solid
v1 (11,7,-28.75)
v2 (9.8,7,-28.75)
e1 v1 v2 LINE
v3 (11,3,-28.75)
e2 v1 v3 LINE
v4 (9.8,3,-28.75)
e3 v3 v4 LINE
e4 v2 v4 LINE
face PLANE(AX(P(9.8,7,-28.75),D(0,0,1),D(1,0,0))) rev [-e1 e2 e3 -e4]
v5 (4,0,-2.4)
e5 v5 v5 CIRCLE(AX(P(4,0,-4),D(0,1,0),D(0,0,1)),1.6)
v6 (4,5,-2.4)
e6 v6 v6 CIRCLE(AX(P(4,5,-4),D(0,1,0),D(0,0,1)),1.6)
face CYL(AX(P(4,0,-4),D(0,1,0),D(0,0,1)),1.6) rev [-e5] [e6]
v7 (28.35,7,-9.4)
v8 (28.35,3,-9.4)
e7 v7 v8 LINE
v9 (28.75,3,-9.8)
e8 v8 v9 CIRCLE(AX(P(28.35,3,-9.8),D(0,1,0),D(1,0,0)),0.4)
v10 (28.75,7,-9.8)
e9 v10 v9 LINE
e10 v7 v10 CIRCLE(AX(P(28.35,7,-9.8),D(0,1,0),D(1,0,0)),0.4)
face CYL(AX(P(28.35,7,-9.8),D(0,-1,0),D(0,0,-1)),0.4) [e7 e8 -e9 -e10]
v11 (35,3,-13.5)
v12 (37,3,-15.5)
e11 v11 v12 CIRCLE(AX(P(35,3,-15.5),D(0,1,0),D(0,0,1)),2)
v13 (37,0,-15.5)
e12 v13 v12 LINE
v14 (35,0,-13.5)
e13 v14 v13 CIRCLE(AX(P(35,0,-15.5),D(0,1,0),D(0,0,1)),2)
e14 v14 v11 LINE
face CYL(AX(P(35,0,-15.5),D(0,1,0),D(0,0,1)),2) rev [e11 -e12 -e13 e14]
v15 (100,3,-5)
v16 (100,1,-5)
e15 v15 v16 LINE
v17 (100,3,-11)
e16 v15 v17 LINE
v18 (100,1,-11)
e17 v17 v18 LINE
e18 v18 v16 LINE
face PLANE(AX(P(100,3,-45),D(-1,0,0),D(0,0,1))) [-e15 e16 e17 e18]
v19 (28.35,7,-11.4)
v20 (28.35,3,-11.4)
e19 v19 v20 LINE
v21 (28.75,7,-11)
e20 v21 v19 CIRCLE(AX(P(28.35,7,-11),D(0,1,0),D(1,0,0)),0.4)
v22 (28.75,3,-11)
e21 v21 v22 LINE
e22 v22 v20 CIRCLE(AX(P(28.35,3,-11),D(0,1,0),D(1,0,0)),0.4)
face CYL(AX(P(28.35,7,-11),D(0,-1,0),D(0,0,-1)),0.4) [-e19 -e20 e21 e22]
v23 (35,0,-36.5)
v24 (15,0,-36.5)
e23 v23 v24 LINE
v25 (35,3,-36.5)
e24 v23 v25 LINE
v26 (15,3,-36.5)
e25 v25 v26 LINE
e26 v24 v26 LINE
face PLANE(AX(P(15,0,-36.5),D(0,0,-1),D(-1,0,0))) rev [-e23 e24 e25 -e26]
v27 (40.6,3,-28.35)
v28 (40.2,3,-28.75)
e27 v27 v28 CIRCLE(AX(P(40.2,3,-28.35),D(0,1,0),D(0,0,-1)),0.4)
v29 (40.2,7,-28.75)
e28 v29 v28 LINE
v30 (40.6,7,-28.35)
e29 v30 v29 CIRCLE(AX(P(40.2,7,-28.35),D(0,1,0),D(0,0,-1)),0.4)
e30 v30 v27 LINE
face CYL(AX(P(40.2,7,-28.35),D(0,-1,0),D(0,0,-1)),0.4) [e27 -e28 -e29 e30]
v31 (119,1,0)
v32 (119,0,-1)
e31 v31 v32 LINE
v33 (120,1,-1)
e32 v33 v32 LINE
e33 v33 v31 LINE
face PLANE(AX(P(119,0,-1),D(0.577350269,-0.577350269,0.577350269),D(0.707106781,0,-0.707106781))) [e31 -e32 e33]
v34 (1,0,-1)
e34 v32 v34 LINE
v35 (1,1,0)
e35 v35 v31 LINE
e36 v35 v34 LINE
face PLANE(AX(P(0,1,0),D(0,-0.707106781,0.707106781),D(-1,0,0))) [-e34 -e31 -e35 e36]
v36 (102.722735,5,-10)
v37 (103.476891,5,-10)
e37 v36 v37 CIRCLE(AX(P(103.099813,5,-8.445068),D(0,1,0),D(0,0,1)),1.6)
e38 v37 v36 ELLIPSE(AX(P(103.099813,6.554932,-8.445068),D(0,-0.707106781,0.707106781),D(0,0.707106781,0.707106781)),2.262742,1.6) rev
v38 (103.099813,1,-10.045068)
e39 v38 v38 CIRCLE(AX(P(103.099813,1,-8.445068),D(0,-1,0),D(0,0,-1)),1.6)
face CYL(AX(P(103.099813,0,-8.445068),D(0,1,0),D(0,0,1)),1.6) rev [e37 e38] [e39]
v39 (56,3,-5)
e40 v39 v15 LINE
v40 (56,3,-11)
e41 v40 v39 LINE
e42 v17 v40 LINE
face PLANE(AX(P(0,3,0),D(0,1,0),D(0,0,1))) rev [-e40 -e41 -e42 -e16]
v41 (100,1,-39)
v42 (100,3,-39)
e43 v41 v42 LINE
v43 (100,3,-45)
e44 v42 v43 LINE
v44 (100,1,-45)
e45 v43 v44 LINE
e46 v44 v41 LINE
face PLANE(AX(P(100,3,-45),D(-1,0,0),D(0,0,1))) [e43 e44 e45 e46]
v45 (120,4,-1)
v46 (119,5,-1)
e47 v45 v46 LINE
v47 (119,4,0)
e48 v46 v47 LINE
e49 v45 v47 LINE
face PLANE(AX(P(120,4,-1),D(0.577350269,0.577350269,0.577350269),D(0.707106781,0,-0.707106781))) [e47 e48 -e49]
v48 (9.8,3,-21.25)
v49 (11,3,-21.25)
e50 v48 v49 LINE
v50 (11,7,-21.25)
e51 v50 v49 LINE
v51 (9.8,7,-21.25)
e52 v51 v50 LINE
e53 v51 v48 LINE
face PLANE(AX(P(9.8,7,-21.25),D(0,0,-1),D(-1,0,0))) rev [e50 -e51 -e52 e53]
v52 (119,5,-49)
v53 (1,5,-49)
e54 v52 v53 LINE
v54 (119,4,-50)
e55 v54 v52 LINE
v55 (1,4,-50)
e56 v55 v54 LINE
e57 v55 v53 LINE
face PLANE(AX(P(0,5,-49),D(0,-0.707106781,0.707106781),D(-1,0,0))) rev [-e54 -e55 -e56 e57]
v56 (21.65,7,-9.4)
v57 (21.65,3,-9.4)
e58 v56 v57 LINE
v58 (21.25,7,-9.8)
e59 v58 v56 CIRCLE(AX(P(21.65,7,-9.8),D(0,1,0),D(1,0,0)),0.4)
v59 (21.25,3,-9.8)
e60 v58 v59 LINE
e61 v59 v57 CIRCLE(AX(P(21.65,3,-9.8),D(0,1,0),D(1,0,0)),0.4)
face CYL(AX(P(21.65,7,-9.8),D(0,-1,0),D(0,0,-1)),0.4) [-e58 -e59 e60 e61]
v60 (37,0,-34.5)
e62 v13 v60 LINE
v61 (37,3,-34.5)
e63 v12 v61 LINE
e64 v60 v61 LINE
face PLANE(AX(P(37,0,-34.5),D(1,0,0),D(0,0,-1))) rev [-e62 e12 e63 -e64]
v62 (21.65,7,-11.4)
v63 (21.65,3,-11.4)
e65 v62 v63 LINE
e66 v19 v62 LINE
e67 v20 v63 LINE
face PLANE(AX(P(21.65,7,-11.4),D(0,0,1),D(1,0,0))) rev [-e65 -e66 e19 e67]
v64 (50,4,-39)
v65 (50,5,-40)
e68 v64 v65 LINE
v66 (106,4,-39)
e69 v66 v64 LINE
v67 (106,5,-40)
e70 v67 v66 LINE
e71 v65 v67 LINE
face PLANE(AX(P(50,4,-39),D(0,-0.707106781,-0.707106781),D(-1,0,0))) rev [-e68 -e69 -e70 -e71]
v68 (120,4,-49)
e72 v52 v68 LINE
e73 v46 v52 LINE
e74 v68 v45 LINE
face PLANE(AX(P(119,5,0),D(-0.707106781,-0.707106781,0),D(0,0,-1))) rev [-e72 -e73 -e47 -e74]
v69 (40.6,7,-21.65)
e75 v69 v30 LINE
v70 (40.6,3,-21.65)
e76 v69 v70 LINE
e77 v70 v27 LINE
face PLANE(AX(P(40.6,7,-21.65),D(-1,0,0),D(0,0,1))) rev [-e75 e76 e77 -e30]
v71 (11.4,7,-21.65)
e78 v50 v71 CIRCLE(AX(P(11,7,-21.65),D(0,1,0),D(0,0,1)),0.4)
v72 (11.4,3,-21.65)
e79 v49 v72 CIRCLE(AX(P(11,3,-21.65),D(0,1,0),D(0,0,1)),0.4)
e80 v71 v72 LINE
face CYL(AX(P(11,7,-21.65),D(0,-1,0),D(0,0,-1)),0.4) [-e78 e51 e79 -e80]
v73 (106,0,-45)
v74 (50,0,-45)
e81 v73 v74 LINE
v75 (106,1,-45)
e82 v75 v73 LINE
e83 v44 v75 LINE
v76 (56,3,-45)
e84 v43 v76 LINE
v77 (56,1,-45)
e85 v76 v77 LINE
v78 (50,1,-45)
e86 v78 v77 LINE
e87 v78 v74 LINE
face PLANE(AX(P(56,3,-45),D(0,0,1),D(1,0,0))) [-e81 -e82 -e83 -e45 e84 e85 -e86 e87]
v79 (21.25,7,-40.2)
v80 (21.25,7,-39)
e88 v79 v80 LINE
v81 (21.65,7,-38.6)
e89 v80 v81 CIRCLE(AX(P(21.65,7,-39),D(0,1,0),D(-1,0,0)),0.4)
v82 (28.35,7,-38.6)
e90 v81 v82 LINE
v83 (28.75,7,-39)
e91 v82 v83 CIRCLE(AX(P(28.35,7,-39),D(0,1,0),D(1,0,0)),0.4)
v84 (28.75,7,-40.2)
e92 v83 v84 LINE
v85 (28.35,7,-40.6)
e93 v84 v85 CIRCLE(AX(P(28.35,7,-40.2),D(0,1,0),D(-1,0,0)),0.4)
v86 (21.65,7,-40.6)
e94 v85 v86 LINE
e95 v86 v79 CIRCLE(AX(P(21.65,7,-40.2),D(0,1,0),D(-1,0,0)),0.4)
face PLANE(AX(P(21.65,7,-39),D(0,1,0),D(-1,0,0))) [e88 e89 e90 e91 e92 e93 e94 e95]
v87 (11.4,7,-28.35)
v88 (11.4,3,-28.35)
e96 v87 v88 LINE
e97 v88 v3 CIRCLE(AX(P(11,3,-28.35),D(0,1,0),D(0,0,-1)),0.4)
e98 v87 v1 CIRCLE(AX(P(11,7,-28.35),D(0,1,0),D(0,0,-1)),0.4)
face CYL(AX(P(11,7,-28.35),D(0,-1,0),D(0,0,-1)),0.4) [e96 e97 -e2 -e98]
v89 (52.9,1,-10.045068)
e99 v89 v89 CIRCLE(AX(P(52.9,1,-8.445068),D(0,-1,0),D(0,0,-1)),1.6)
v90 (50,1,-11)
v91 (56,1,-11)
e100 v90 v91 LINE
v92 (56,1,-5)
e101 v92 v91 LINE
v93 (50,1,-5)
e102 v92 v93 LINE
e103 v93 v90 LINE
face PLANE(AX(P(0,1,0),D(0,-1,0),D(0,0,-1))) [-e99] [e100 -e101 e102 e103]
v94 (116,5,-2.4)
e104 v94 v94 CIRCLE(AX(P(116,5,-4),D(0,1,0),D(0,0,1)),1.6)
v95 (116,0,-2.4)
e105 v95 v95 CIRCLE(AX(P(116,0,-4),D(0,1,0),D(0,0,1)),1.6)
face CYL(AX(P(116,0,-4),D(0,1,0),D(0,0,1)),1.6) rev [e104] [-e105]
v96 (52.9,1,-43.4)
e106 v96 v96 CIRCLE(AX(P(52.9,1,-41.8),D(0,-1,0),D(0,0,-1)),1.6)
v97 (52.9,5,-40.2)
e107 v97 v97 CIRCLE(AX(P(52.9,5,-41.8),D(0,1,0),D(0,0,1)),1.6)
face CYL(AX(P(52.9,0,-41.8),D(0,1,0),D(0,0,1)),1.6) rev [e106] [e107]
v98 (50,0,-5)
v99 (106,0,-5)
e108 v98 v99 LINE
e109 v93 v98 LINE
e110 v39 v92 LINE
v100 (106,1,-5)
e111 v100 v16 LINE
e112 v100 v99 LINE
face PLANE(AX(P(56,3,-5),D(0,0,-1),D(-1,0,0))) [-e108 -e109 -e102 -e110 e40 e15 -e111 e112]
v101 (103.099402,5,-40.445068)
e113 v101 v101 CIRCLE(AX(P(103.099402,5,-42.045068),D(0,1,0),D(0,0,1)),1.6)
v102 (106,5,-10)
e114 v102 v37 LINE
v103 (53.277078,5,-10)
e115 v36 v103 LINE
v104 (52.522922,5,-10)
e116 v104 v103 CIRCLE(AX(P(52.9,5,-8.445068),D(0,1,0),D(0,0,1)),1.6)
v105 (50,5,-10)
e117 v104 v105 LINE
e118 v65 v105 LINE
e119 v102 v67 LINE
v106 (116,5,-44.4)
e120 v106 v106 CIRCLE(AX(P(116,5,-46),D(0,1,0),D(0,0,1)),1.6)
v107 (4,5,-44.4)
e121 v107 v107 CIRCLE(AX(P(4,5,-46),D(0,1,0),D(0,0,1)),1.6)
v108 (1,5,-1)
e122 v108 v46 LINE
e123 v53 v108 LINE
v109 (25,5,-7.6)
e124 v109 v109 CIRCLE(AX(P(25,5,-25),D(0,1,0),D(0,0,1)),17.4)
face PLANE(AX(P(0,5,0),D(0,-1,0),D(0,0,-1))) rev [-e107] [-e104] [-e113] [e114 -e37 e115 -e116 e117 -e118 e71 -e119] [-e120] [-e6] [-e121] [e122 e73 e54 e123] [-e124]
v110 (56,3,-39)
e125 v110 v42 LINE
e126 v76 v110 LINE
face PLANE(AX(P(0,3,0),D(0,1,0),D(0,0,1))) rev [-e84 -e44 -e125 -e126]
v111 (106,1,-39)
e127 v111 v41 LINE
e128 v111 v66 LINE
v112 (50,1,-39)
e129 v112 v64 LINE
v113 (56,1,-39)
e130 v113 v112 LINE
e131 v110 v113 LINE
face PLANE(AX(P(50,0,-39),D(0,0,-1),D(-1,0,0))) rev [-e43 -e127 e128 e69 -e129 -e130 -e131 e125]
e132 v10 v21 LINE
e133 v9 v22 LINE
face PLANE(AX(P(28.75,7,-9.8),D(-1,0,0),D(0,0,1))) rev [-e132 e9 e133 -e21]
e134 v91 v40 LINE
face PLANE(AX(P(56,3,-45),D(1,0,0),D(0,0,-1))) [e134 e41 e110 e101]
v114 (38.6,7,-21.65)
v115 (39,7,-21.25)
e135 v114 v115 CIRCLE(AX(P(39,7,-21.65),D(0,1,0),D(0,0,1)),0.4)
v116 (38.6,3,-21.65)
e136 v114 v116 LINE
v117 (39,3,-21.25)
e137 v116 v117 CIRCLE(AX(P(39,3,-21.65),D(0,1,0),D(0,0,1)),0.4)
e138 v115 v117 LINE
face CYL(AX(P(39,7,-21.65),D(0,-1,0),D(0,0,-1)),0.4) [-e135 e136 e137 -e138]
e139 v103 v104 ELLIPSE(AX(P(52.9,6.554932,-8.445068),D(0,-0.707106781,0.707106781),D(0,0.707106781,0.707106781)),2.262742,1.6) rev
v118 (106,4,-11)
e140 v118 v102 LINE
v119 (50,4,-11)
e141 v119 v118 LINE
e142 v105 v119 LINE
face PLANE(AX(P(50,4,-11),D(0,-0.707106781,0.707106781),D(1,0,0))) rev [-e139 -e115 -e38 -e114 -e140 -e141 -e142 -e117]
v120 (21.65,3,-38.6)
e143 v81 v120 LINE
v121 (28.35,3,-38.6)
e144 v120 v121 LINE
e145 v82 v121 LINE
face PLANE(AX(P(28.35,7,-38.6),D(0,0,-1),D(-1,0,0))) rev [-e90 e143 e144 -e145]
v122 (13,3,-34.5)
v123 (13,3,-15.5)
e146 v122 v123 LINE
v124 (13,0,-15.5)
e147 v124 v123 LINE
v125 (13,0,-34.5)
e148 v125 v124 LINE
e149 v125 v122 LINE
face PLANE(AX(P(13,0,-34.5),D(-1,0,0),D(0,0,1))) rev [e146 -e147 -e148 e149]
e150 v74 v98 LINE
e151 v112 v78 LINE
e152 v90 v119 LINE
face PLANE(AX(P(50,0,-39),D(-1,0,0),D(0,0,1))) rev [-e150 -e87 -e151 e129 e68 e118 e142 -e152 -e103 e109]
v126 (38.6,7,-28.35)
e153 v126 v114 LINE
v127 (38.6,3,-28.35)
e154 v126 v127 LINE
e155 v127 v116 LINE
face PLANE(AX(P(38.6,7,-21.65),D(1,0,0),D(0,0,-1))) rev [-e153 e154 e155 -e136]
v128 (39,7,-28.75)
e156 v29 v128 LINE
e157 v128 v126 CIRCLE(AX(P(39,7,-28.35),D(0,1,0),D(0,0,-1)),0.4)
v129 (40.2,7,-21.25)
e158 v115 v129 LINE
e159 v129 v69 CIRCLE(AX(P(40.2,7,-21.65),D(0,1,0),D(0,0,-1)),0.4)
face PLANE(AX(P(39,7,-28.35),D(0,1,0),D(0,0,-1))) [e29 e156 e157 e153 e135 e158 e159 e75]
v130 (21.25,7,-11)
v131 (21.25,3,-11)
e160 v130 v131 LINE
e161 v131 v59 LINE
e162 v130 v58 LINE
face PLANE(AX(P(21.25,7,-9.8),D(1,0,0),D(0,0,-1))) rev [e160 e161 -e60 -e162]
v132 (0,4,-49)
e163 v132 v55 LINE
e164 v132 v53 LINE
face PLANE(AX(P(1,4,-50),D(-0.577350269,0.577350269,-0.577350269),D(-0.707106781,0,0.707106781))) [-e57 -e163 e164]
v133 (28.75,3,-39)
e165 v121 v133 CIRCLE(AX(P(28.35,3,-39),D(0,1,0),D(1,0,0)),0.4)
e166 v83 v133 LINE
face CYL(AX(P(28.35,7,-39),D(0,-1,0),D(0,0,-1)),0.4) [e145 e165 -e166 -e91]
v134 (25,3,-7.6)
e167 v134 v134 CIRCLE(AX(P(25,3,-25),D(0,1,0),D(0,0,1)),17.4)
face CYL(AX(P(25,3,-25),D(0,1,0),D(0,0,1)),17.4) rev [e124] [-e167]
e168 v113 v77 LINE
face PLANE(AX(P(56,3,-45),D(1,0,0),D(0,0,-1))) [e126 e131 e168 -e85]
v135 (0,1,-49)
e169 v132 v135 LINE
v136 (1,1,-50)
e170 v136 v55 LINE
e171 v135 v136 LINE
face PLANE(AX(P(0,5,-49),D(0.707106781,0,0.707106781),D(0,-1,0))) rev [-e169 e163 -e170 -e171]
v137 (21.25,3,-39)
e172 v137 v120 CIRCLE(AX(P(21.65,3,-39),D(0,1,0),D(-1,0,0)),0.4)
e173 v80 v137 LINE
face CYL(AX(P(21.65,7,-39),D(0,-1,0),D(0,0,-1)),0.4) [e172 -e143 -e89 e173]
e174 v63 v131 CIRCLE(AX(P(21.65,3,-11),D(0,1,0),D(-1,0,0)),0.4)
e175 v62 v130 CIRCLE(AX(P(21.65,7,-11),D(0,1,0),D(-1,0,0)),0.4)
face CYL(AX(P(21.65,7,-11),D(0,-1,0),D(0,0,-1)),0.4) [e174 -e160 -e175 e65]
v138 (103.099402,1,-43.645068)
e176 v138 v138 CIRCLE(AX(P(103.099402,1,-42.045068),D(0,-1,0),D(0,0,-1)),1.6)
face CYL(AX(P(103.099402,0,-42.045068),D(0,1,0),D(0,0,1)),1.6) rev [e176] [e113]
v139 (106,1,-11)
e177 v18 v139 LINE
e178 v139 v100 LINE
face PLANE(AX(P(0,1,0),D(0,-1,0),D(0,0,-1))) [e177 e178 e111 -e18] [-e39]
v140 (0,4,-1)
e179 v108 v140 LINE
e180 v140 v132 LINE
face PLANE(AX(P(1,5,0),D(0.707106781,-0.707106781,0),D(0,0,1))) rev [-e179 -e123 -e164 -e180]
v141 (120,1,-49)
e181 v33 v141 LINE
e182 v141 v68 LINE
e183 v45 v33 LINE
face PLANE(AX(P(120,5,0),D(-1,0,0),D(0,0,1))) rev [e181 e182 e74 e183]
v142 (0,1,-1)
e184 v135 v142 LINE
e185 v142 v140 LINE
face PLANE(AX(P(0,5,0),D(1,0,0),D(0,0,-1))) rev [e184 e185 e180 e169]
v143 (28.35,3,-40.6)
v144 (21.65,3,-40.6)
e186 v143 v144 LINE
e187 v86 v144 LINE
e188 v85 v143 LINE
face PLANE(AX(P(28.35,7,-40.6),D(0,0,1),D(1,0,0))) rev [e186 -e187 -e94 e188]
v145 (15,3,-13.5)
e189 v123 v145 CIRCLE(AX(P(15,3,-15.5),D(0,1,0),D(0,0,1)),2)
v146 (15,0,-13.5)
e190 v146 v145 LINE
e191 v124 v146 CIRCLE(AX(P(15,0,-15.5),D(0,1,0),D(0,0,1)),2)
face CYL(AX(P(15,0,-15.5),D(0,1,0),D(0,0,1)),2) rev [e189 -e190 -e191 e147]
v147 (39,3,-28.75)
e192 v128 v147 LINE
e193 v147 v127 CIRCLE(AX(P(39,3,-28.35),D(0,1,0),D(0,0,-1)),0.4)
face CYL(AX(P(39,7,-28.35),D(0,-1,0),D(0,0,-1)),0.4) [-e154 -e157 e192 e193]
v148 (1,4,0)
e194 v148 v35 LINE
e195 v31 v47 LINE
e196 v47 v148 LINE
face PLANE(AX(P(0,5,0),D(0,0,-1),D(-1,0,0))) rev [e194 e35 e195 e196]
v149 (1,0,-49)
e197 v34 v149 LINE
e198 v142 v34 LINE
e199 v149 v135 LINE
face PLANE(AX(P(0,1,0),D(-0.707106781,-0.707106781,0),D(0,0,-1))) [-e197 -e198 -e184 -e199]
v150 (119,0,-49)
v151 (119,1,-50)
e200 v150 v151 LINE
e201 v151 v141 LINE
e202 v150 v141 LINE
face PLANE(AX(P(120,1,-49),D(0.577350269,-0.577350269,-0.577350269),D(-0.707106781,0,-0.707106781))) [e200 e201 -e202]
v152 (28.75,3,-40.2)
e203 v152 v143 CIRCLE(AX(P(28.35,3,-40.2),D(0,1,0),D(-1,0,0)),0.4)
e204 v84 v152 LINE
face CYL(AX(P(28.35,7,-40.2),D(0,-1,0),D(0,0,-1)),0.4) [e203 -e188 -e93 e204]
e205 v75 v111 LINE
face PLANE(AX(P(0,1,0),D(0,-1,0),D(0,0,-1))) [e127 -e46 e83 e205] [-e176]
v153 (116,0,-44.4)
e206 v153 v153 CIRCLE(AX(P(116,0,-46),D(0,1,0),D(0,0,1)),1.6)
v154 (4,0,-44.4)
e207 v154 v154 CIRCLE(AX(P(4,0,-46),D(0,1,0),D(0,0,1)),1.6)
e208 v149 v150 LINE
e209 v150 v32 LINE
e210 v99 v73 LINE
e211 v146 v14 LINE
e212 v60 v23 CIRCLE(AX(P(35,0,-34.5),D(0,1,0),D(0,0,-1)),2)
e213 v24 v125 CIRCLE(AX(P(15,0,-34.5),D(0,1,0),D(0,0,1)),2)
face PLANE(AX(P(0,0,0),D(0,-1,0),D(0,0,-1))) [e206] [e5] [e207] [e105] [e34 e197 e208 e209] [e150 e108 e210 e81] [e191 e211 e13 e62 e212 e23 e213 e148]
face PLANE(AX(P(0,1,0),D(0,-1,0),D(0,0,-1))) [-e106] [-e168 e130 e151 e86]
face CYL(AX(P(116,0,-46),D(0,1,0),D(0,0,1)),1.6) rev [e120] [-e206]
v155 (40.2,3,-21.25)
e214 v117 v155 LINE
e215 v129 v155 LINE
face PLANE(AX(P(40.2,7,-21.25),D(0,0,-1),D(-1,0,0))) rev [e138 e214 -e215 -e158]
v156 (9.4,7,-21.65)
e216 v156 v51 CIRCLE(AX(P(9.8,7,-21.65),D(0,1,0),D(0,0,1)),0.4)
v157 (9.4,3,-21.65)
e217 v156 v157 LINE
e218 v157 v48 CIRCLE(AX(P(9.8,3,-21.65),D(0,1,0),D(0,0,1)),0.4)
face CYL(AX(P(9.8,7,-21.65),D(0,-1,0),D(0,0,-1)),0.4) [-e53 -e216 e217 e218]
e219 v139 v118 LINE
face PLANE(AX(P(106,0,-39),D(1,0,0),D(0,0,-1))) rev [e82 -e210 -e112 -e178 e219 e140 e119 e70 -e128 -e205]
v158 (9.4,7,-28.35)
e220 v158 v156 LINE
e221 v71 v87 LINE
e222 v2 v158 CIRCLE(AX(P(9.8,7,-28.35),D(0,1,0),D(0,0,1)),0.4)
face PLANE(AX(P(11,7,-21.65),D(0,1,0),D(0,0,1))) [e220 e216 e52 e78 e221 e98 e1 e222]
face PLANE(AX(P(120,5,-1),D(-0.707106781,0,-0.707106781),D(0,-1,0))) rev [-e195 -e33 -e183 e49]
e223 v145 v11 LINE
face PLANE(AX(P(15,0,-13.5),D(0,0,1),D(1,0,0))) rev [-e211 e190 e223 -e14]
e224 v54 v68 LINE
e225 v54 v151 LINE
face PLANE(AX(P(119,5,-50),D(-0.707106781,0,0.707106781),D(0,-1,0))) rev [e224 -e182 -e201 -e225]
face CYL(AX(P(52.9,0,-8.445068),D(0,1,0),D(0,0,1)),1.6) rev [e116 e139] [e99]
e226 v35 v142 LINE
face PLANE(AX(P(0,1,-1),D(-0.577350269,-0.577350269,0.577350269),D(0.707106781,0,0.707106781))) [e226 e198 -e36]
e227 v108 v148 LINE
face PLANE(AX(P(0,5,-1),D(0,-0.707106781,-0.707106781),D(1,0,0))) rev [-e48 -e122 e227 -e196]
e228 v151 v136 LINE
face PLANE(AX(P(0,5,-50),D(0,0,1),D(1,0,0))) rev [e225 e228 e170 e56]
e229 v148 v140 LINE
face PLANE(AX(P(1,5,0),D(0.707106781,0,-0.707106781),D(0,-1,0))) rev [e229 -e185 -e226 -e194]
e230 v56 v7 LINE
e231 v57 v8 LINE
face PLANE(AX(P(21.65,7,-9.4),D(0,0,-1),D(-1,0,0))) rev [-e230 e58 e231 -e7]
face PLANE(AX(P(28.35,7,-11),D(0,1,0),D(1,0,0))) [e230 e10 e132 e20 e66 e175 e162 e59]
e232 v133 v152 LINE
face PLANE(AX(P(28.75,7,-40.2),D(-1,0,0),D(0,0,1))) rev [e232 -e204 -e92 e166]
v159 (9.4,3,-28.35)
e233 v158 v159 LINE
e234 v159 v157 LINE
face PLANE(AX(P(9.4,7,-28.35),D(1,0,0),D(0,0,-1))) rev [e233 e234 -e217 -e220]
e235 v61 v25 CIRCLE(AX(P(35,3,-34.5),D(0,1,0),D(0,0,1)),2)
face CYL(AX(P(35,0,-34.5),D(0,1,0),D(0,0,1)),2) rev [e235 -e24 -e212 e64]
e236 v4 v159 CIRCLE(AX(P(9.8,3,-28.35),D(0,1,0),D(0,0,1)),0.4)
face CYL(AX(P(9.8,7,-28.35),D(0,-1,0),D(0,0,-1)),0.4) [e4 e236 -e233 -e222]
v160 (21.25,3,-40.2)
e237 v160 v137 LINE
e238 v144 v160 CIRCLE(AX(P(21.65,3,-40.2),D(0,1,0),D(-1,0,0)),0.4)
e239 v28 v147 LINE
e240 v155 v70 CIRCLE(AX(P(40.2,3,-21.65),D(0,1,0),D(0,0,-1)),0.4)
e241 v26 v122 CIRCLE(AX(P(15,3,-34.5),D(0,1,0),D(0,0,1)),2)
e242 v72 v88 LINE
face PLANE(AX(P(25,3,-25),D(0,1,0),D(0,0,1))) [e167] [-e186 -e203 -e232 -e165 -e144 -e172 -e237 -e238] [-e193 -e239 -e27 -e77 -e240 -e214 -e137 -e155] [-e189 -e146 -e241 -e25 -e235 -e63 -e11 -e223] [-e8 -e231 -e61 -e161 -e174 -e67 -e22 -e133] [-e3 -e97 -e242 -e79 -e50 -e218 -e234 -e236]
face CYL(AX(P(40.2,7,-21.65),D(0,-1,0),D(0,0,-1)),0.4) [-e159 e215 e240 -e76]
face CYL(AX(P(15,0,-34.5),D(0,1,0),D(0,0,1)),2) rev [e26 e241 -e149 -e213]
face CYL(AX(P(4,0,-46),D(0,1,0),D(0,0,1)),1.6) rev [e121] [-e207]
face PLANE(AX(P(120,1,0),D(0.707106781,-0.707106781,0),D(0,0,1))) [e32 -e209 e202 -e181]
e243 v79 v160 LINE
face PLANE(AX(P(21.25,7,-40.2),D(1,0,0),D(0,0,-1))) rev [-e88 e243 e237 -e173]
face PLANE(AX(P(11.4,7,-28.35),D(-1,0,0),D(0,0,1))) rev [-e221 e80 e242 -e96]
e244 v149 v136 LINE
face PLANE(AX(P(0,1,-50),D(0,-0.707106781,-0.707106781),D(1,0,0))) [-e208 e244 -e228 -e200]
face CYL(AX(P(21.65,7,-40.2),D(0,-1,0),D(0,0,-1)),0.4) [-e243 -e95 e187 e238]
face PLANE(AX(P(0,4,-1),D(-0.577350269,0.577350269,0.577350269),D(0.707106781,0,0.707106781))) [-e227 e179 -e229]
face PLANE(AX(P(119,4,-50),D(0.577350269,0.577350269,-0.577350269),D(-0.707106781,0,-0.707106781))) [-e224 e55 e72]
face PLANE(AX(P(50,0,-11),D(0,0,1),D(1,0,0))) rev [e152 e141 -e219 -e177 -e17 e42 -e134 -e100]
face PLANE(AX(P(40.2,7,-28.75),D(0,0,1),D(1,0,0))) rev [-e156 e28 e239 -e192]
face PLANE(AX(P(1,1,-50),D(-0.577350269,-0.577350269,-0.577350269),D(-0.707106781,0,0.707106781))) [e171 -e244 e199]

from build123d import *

# Parameters (mm, degrees)
SKETCH1_W           = 120
SKETCH1_H           = 50
BOSS_EXTRUDE1_DEPTH = 5
SKETCH4_R           = 17.4
CUT_EXTRUDE3_DEPTH  = 2
CUT_EXTRUDE2_DEPTH  = 5
BOSS_EXTRUDE2_DEPTH = 4
CIRPATTERN1_COUNT   = 4
SKETCH6_R           = 1.6
CUT_EXTRUDE4_DEPTH  = 131.096118313
SKETCH8_W           = 56
SKETCH8_H           = 28
CUT_EXTRUDE5_DEPTH  = 131.096118313
SKETCH9_W           = 44
SKETCH9_H           = 40
CUT_EXTRUDE6_DEPTH  = 3
SKETCH10_W          = 56
SKETCH10_H          = 40
CUT_EXTRUDE7_DEPTH  = 1
SKETCH11_R          = 1.6
CUT_EXTRUDE8_DEPTH  = 131.096118313
CHAMFER1_SIZE       = 1
CHAMFER2_SIZE       = 1


with BuildPart() as part:
    # Sketch1 → Boss-Extrude1 (new body)
    with BuildSketch(Plane(origin=(0, 0, 0), x_dir=(1, 0, 0), z_dir=(0, 1, 0))):
        with Locations((60, 25)):
            Rectangle(SKETCH1_W, SKETCH1_H)
    extrude(amount=BOSS_EXTRUDE1_DEPTH)

    # Sketch4 → Cut-Extrude3 (cut)
    with BuildSketch(Plane(origin=(0, 5, 0), x_dir=(1, 0, 0), z_dir=(0, 1, 0))):
        with Locations(Location((25, 25, 0), (0, 0, 270))):
            Circle(SKETCH4_R)
    extrude(amount=-CUT_EXTRUDE3_DEPTH, mode=Mode.SUBTRACT)

    # Sketch3 → Cut-Extrude2 (cut)
    with BuildSketch(Plane(origin=(0, 5, 0), x_dir=(1, 0, 0), z_dir=(0, 1, 0))):
        with BuildLine():
            Line((15, 36.5), (35, 36.5))
            ThreePointArc((35, 36.5), (36.414213562, 35.914213562), (37, 34.5))
            Line((37, 34.5), (37, 15.5))
            ThreePointArc((37, 15.5), (36.414213562, 14.085786438), (35, 13.5))
            Line((35, 13.5), (15, 13.5))
            ThreePointArc((15, 13.5), (13.585786438, 14.085786438), (13, 15.5))
            Line((13, 15.5), (13, 34.5))
            ThreePointArc((13, 34.5), (13.585786438, 35.914213562), (15, 36.5))
        make_face()
    extrude(amount=-CUT_EXTRUDE2_DEPTH, mode=Mode.SUBTRACT)

    # Sketch5 → Boss-Extrude2 (add)
    with BuildSketch(Plane(origin=(0, 3, 0), x_dir=(1, 0, 0), z_dir=(0, 1, 0))):
        with BuildLine():
            Line((9.8, 28.75), (11, 28.75))
            ThreePointArc((11, 28.75), (11.282842712, 28.632842712), (11.4, 28.35))
            Line((11.4, 28.35), (11.4, 21.65))
            ThreePointArc((11.4, 21.65), (11.282842712, 21.367157288), (11, 21.25))
            Line((11, 21.25), (9.8, 21.25))
            ThreePointArc((9.8, 21.25), (9.517157288, 21.367157288), (9.4, 21.65))
            Line((9.4, 21.65), (9.4, 28.35))
            ThreePointArc((9.4, 28.35), (9.517157288, 28.632842712), (9.8, 28.75))
        make_face()
    boss_extrude2 = extrude(amount=BOSS_EXTRUDE2_DEPTH)

    # CirPattern1: Boss-Extrude2 ×4 about axis
    cirpattern1_axis = Axis((25, 0, -25), (0, 1, 0))
    for i in range(1, CIRPATTERN1_COUNT):
        add(boss_extrude2.rotate(cirpattern1_axis, i * 360 / CIRPATTERN1_COUNT))

    # Sketch6 → Cut-Extrude4 (cut, through all)
    with BuildSketch(Plane(origin=(0, 5, 0), x_dir=(1, 0, 0), z_dir=(0, 1, 0))):
        with Locations(Location((4, 46, 0), (0, 0, 270))):
            Circle(SKETCH6_R)
        with Locations(Location((116, 46, 0), (0, 0, 270))):
            Circle(SKETCH6_R)
        with Locations(Location((116, 4, 0), (0, 0, 270))):
            Circle(SKETCH6_R)
        with Locations(Location((4, 4, 0), (0, 0, 270))):
            Circle(SKETCH6_R)
    extrude(amount=-CUT_EXTRUDE4_DEPTH, mode=Mode.SUBTRACT)

    # Sketch8 → Cut-Extrude5 (cut, through all)
    with BuildSketch(Plane(origin=(0, 5, 0), x_dir=(1, 0, 0), z_dir=(0, 1, 0))):
        with Locations((78, 25)):
            Rectangle(SKETCH8_W, SKETCH8_H)
    extrude(amount=-CUT_EXTRUDE5_DEPTH, mode=Mode.SUBTRACT)

    # Sketch9 → Cut-Extrude6 (cut)
    with BuildSketch(Plane(origin=(0, 0, 0), x_dir=(1, 0, 0), z_dir=(0, 1, 0))):
        with Locations((78, 25)):
            Rectangle(SKETCH9_W, SKETCH9_H)
    extrude(amount=CUT_EXTRUDE6_DEPTH, mode=Mode.SUBTRACT)

    # Sketch10 → Cut-Extrude7 (cut)
    with BuildSketch(Plane.XZ):
        with Locations((78, -25)):
            Rectangle(SKETCH10_W, SKETCH10_H)
    extrude(amount=-CUT_EXTRUDE7_DEPTH, mode=Mode.SUBTRACT)

    # Sketch11 → Cut-Extrude8 (cut, through all)
    with BuildSketch(Plane(origin=(0, 5, 0), x_dir=(1, 0, 0), z_dir=(0, 1, 0))):
        with Locations(Location((52.9, 41.8, 0), (0, 0, 270))):
            Circle(SKETCH11_R)
        with Locations(Location((103.099401804, 42.045068405, 0), (0, 0, 270))):
            Circle(SKETCH11_R)
        with Locations(Location((103.099812841, 8.445068408, 0), (0, 0, 270))):
            Circle(SKETCH11_R)
        with Locations(Location((52.9, 8.445068408, 0), (0, 0, 270))):
            Circle(SKETCH11_R)
    extrude(amount=-CUT_EXTRUDE8_DEPTH, mode=Mode.SUBTRACT)

    # Chamfer1
    chamfer1_edges = [part.edges().sort_by_distance(p)[0] for p in [
        (120, 5, -25),
        (60, 5, -50),
        (0, 5, -25),
        (60, 0, -50),
        (120, 0, -25),
        (60, 0, 0),
        (0, 0, -25),
        (0, 2.5, -50),
        (120, 2.5, -50),
        (120, 2.5, 0),
        (0, 2.5, 0),
        (60, 5, 0),
    ]]
    chamfer(chamfer1_edges, length=CHAMFER1_SIZE)

    # Chamfer2
    # the kernel refuses this chamfer: 1 mm, written as the material it takes off along each edge
    with BuildSketch(Plane(origin=(106, 5, -11), x_dir=(0, 0.02749587661058651, 0.9996219169112968), z_dir=(-1, 0, 0)), Plane(origin=(50, 5, -39), x_dir=(0, 0.027495876610586414, -0.9996219169112968), z_dir=(1, 0, 0))) as chamfer2_piece_1:
        Polygon((CHAMFER2_SIZE * 0.999621916911, -CHAMFER2_SIZE * 0.0274958766106), (-CHAMFER2_SIZE * 0.0274958766106, -CHAMFER2_SIZE * 0.999621916911), (0, 0), align=None)
    extrude(amount=56, mode=Mode.SUBTRACT)


solid = part.part
